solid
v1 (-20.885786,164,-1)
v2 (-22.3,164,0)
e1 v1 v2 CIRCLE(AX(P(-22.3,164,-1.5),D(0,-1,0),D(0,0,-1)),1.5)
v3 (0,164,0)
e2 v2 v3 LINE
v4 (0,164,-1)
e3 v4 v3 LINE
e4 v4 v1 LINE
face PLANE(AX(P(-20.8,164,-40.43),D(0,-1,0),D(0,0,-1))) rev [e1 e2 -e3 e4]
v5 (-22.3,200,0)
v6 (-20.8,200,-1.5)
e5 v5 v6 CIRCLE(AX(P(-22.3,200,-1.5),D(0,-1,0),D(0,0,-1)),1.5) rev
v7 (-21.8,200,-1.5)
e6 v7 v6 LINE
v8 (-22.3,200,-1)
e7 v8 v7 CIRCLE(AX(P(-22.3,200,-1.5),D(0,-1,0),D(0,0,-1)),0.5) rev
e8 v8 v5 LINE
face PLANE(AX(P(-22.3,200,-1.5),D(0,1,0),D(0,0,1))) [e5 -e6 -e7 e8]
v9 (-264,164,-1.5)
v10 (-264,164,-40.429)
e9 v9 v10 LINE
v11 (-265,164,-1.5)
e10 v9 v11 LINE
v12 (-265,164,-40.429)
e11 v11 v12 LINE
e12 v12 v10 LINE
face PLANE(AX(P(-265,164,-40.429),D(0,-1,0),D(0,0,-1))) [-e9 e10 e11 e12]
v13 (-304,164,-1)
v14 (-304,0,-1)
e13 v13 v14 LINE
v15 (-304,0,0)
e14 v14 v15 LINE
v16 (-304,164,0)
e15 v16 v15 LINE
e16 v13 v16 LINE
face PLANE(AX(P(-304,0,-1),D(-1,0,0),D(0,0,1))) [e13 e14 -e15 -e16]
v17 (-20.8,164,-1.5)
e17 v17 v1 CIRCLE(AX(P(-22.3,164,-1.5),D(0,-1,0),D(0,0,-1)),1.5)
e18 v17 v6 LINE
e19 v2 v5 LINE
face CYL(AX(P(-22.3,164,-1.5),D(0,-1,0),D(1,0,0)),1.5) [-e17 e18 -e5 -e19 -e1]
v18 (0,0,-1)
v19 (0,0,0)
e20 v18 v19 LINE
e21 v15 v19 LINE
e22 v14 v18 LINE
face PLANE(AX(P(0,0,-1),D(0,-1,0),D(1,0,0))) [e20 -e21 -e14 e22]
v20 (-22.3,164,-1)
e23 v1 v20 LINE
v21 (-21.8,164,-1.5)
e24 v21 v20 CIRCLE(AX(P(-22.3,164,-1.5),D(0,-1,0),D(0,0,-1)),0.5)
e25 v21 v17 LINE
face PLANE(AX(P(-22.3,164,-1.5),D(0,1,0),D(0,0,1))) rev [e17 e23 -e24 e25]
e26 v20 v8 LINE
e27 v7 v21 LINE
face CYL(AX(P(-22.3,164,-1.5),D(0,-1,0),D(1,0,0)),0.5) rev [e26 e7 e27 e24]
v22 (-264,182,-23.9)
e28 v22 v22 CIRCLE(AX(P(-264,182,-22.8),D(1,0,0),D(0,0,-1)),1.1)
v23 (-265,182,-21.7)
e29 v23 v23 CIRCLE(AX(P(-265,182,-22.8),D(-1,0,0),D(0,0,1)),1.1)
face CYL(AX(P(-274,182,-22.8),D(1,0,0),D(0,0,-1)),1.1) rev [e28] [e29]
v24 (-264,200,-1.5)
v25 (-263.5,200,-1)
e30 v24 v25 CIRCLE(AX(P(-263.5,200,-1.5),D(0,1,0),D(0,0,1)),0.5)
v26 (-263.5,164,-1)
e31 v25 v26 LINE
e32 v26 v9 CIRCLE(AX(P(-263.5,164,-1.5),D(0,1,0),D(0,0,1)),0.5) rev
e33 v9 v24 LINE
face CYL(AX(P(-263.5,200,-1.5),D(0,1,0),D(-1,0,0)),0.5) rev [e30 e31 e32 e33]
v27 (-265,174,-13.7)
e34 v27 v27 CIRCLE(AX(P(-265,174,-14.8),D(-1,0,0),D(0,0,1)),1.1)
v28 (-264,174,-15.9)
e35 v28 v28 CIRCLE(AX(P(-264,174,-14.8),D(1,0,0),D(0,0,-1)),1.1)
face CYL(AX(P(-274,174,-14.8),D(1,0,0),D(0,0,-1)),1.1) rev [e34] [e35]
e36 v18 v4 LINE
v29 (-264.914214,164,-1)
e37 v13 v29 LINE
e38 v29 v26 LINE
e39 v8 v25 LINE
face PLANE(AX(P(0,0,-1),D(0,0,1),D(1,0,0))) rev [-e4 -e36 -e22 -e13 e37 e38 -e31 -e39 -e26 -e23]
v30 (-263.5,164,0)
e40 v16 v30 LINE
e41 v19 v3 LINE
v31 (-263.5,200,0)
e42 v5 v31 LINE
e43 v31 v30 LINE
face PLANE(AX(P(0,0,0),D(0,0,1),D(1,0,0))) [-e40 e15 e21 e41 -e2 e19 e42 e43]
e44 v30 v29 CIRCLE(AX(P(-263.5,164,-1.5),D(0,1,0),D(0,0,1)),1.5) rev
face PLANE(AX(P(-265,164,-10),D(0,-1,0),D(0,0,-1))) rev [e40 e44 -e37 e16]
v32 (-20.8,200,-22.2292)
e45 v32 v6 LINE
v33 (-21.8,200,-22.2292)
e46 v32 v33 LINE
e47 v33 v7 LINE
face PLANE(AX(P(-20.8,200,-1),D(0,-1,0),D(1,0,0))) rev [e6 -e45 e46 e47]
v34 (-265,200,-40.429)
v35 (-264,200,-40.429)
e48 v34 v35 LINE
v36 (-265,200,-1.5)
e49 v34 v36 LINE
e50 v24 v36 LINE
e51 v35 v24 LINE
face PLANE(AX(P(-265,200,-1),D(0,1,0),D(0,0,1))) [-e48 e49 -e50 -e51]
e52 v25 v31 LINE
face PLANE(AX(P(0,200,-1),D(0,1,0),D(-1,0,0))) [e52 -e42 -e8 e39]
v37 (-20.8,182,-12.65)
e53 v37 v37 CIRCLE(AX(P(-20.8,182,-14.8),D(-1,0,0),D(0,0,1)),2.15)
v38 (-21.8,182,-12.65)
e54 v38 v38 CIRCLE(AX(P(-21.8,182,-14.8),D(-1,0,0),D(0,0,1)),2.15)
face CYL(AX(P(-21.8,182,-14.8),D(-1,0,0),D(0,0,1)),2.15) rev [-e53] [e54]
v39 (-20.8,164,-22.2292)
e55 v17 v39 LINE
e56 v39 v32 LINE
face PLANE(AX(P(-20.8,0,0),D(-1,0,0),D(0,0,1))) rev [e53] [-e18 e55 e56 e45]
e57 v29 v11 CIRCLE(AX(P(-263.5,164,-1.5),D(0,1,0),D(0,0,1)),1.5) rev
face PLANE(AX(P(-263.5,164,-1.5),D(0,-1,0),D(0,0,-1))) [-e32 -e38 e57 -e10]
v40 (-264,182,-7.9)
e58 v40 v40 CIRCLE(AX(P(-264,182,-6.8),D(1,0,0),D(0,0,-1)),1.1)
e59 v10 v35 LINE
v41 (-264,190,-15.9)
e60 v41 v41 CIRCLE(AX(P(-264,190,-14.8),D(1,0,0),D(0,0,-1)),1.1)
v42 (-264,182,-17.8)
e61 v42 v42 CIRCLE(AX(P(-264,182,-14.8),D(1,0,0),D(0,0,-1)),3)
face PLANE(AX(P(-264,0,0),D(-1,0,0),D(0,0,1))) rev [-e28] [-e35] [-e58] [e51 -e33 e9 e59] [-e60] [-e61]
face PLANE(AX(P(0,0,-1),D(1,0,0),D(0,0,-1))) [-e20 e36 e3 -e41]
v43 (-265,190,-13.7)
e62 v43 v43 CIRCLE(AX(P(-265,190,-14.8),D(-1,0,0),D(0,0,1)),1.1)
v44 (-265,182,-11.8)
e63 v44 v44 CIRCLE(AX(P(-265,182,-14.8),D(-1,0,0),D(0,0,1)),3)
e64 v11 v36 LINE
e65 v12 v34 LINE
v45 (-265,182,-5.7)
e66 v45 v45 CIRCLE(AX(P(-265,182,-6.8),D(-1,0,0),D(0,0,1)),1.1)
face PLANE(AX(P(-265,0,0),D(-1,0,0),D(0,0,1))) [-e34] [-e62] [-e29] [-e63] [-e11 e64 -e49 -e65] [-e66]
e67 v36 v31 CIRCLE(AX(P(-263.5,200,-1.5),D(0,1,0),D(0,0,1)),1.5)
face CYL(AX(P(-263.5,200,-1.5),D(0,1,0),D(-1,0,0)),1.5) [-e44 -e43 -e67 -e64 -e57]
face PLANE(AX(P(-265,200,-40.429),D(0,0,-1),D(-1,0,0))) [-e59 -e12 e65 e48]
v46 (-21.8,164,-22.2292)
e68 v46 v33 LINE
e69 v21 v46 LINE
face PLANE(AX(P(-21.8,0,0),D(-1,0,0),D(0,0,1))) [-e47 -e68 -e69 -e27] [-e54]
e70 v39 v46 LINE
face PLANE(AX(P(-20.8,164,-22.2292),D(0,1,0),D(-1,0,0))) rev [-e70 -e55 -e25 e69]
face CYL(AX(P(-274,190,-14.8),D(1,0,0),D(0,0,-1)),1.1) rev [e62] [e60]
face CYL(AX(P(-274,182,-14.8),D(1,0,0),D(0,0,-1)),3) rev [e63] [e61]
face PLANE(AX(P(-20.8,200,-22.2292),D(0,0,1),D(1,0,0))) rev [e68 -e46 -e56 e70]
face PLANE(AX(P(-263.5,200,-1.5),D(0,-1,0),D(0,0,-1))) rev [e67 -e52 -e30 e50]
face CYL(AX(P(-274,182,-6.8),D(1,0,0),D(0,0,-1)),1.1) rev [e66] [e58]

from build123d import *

# Parameters (mm, degrees)
SKETCH1_W                    = 304
SKETCH1_H                    = 200
BASE_FLANGE1_DEPTH           = 1
SKETCH2_W                    = 39
SKETCH2_H                    = 36
CUT_EXTRUDE1_DEPTH           = 10
EDGE_FLANGE1_STRIP_W         = 5
EDGE_FLANGE1_STRIP_H         = 1
EDGE_FLANGE1_STRIP_CUT_DEPTH = 36
EDGE_FLANGE1_DEPTH           = 36
SKETCH9_R                    = 1.1
SKETCH9_R_2                  = 3
CUT_EXTRUDE2_DEPTH           = 10
CUT_EXTRUDE4_REACH           = 368.129
SKETCH18_W                   = 20.8
SKETCH18_H                   = 36
EDGE_FLANGE2_STRIP_W         = 5
EDGE_FLANGE2_STRIP_H         = 1
EDGE_FLANGE2_STRIP_CUT_DEPTH = 36
EDGE_FLANGE2_DEPTH           = 36
M4_CLEARANCE_HOLE2_D         = 4.3


# Sheet-metal steps are written as plain solids
with BuildPart() as part:
    # Sketch1 → Base-Flange1 (new body)
    with BuildSketch(Plane.XY):
        with Locations((-152, 100)):
            Rectangle(SKETCH1_W, SKETCH1_H)
    extrude(amount=-BASE_FLANGE1_DEPTH)

    # Sketch2 → Cut-Extrude1 (cut)
    with BuildSketch(Plane.XY):
        with Locations((-284.5, 182)):
            Rectangle(SKETCH2_W, SKETCH2_H)
    extrude(amount=-CUT_EXTRUDE1_DEPTH, mode=Mode.SUBTRACT)

    # Edge-Flange1 strip (across the edge) → Edge-Flange1 strip cut (cut)
    with BuildSketch(Plane(origin=(-265, 164, -1), x_dir=(1, 0, 0), z_dir=(0, 1, 0))):
        with Locations((-1, -0.5)):
            Rectangle(EDGE_FLANGE1_STRIP_W, EDGE_FLANGE1_STRIP_H)
    extrude(amount=EDGE_FLANGE1_STRIP_CUT_DEPTH, mode=Mode.SUBTRACT)

    # Edge-Flange1 section (across the edge) → Edge-Flange1 (add)
    with BuildSketch(Plane(origin=(-265, 164, -1), x_dir=(1, 0, 0), z_dir=(0, 1, 0))):
        with BuildLine():
            Line((0, 0.5), (0, 39.429))
            Line((0, 39.429), (1, 39.429))
            Line((1, 39.429), (1, 0.5))
            ThreePointArc((1, 0.5), (1.146446609, 0.146446609), (1.5, 0))
            Line((1.5, 0), (1.5, -1))
            ThreePointArc((1.5, -1), (0.439339828, -0.560660172), (0, 0.5))
        make_face()
    extrude(amount=EDGE_FLANGE1_DEPTH)

    # Sketch9 → Cut-Extrude2 (cut)
    with BuildSketch(Plane(origin=(-264, 0, 0), x_dir=(0, 0, -1), z_dir=(1, 0, 0))):
        with Locations((22.8, 182)):
            Circle(SKETCH9_R)
        with Locations((14.8, 190)):
            Circle(SKETCH9_R)
        with Locations((14.8, 174)):
            Circle(SKETCH9_R)
        with Locations((6.8, 182)):
            Circle(SKETCH9_R)
        with Locations((14.8, 182)):
            Circle(SKETCH9_R_2)
    extrude(amount=-CUT_EXTRUDE2_DEPTH, mode=Mode.SUBTRACT)

    # Sketch18 → Cut-Extrude4 (cut, up to next)
    with BuildSketch(Plane.XY, mode=Mode.PRIVATE) as cut_extrude4_sk1:
        with Locations((-10.4, 182)):
            Rectangle(SKETCH18_W, SKETCH18_H)
    cut_extrude4_tool1 = extrude(cut_extrude4_sk1.sketch, amount=-CUT_EXTRUDE4_REACH, mode=Mode.PRIVATE) & part.part
    add(cut_extrude4_tool1.solids().sort_by_distance((-10.4, 182, 0))[0], mode=Mode.SUBTRACT)

    # Edge-Flange2 strip (across the edge) → Edge-Flange2 strip cut (cut)
    with BuildSketch(Plane(origin=(-20.8, 200, -1), x_dir=(-1, 0, 0), z_dir=(0, -1, 0))):
        with Locations((-1, -0.5)):
            Rectangle(EDGE_FLANGE2_STRIP_W, EDGE_FLANGE2_STRIP_H)
    extrude(amount=EDGE_FLANGE2_STRIP_CUT_DEPTH, mode=Mode.SUBTRACT)

    # Edge-Flange2 section (across the edge) → Edge-Flange2 (add)
    with BuildSketch(Plane(origin=(-20.8, 200, -1), x_dir=(-1, 0, 0), z_dir=(0, -1, 0))):
        with BuildLine():
            Line((0, 0.5), (0, 21.2292))
            Line((0, 21.2292), (1, 21.2292))
            Line((1, 21.2292), (1, 0.5))
            ThreePointArc((1, 0.5), (1.146446609, 0.146446609), (1.5, 0))
            Line((1.5, 0), (1.5, -1))
            ThreePointArc((1.5, -1), (0.439339828, -0.560660172), (0, 0.5))
        make_face()
    extrude(amount=EDGE_FLANGE2_DEPTH)

    # M4 Clearance Hole2 (through all)
    with Locations(Plane.ZY.offset(21.8)):
        with Locations((-14.8, 182)):
            Hole(M4_CLEARANCE_HOLE2_D / 2)


solid = part.part
